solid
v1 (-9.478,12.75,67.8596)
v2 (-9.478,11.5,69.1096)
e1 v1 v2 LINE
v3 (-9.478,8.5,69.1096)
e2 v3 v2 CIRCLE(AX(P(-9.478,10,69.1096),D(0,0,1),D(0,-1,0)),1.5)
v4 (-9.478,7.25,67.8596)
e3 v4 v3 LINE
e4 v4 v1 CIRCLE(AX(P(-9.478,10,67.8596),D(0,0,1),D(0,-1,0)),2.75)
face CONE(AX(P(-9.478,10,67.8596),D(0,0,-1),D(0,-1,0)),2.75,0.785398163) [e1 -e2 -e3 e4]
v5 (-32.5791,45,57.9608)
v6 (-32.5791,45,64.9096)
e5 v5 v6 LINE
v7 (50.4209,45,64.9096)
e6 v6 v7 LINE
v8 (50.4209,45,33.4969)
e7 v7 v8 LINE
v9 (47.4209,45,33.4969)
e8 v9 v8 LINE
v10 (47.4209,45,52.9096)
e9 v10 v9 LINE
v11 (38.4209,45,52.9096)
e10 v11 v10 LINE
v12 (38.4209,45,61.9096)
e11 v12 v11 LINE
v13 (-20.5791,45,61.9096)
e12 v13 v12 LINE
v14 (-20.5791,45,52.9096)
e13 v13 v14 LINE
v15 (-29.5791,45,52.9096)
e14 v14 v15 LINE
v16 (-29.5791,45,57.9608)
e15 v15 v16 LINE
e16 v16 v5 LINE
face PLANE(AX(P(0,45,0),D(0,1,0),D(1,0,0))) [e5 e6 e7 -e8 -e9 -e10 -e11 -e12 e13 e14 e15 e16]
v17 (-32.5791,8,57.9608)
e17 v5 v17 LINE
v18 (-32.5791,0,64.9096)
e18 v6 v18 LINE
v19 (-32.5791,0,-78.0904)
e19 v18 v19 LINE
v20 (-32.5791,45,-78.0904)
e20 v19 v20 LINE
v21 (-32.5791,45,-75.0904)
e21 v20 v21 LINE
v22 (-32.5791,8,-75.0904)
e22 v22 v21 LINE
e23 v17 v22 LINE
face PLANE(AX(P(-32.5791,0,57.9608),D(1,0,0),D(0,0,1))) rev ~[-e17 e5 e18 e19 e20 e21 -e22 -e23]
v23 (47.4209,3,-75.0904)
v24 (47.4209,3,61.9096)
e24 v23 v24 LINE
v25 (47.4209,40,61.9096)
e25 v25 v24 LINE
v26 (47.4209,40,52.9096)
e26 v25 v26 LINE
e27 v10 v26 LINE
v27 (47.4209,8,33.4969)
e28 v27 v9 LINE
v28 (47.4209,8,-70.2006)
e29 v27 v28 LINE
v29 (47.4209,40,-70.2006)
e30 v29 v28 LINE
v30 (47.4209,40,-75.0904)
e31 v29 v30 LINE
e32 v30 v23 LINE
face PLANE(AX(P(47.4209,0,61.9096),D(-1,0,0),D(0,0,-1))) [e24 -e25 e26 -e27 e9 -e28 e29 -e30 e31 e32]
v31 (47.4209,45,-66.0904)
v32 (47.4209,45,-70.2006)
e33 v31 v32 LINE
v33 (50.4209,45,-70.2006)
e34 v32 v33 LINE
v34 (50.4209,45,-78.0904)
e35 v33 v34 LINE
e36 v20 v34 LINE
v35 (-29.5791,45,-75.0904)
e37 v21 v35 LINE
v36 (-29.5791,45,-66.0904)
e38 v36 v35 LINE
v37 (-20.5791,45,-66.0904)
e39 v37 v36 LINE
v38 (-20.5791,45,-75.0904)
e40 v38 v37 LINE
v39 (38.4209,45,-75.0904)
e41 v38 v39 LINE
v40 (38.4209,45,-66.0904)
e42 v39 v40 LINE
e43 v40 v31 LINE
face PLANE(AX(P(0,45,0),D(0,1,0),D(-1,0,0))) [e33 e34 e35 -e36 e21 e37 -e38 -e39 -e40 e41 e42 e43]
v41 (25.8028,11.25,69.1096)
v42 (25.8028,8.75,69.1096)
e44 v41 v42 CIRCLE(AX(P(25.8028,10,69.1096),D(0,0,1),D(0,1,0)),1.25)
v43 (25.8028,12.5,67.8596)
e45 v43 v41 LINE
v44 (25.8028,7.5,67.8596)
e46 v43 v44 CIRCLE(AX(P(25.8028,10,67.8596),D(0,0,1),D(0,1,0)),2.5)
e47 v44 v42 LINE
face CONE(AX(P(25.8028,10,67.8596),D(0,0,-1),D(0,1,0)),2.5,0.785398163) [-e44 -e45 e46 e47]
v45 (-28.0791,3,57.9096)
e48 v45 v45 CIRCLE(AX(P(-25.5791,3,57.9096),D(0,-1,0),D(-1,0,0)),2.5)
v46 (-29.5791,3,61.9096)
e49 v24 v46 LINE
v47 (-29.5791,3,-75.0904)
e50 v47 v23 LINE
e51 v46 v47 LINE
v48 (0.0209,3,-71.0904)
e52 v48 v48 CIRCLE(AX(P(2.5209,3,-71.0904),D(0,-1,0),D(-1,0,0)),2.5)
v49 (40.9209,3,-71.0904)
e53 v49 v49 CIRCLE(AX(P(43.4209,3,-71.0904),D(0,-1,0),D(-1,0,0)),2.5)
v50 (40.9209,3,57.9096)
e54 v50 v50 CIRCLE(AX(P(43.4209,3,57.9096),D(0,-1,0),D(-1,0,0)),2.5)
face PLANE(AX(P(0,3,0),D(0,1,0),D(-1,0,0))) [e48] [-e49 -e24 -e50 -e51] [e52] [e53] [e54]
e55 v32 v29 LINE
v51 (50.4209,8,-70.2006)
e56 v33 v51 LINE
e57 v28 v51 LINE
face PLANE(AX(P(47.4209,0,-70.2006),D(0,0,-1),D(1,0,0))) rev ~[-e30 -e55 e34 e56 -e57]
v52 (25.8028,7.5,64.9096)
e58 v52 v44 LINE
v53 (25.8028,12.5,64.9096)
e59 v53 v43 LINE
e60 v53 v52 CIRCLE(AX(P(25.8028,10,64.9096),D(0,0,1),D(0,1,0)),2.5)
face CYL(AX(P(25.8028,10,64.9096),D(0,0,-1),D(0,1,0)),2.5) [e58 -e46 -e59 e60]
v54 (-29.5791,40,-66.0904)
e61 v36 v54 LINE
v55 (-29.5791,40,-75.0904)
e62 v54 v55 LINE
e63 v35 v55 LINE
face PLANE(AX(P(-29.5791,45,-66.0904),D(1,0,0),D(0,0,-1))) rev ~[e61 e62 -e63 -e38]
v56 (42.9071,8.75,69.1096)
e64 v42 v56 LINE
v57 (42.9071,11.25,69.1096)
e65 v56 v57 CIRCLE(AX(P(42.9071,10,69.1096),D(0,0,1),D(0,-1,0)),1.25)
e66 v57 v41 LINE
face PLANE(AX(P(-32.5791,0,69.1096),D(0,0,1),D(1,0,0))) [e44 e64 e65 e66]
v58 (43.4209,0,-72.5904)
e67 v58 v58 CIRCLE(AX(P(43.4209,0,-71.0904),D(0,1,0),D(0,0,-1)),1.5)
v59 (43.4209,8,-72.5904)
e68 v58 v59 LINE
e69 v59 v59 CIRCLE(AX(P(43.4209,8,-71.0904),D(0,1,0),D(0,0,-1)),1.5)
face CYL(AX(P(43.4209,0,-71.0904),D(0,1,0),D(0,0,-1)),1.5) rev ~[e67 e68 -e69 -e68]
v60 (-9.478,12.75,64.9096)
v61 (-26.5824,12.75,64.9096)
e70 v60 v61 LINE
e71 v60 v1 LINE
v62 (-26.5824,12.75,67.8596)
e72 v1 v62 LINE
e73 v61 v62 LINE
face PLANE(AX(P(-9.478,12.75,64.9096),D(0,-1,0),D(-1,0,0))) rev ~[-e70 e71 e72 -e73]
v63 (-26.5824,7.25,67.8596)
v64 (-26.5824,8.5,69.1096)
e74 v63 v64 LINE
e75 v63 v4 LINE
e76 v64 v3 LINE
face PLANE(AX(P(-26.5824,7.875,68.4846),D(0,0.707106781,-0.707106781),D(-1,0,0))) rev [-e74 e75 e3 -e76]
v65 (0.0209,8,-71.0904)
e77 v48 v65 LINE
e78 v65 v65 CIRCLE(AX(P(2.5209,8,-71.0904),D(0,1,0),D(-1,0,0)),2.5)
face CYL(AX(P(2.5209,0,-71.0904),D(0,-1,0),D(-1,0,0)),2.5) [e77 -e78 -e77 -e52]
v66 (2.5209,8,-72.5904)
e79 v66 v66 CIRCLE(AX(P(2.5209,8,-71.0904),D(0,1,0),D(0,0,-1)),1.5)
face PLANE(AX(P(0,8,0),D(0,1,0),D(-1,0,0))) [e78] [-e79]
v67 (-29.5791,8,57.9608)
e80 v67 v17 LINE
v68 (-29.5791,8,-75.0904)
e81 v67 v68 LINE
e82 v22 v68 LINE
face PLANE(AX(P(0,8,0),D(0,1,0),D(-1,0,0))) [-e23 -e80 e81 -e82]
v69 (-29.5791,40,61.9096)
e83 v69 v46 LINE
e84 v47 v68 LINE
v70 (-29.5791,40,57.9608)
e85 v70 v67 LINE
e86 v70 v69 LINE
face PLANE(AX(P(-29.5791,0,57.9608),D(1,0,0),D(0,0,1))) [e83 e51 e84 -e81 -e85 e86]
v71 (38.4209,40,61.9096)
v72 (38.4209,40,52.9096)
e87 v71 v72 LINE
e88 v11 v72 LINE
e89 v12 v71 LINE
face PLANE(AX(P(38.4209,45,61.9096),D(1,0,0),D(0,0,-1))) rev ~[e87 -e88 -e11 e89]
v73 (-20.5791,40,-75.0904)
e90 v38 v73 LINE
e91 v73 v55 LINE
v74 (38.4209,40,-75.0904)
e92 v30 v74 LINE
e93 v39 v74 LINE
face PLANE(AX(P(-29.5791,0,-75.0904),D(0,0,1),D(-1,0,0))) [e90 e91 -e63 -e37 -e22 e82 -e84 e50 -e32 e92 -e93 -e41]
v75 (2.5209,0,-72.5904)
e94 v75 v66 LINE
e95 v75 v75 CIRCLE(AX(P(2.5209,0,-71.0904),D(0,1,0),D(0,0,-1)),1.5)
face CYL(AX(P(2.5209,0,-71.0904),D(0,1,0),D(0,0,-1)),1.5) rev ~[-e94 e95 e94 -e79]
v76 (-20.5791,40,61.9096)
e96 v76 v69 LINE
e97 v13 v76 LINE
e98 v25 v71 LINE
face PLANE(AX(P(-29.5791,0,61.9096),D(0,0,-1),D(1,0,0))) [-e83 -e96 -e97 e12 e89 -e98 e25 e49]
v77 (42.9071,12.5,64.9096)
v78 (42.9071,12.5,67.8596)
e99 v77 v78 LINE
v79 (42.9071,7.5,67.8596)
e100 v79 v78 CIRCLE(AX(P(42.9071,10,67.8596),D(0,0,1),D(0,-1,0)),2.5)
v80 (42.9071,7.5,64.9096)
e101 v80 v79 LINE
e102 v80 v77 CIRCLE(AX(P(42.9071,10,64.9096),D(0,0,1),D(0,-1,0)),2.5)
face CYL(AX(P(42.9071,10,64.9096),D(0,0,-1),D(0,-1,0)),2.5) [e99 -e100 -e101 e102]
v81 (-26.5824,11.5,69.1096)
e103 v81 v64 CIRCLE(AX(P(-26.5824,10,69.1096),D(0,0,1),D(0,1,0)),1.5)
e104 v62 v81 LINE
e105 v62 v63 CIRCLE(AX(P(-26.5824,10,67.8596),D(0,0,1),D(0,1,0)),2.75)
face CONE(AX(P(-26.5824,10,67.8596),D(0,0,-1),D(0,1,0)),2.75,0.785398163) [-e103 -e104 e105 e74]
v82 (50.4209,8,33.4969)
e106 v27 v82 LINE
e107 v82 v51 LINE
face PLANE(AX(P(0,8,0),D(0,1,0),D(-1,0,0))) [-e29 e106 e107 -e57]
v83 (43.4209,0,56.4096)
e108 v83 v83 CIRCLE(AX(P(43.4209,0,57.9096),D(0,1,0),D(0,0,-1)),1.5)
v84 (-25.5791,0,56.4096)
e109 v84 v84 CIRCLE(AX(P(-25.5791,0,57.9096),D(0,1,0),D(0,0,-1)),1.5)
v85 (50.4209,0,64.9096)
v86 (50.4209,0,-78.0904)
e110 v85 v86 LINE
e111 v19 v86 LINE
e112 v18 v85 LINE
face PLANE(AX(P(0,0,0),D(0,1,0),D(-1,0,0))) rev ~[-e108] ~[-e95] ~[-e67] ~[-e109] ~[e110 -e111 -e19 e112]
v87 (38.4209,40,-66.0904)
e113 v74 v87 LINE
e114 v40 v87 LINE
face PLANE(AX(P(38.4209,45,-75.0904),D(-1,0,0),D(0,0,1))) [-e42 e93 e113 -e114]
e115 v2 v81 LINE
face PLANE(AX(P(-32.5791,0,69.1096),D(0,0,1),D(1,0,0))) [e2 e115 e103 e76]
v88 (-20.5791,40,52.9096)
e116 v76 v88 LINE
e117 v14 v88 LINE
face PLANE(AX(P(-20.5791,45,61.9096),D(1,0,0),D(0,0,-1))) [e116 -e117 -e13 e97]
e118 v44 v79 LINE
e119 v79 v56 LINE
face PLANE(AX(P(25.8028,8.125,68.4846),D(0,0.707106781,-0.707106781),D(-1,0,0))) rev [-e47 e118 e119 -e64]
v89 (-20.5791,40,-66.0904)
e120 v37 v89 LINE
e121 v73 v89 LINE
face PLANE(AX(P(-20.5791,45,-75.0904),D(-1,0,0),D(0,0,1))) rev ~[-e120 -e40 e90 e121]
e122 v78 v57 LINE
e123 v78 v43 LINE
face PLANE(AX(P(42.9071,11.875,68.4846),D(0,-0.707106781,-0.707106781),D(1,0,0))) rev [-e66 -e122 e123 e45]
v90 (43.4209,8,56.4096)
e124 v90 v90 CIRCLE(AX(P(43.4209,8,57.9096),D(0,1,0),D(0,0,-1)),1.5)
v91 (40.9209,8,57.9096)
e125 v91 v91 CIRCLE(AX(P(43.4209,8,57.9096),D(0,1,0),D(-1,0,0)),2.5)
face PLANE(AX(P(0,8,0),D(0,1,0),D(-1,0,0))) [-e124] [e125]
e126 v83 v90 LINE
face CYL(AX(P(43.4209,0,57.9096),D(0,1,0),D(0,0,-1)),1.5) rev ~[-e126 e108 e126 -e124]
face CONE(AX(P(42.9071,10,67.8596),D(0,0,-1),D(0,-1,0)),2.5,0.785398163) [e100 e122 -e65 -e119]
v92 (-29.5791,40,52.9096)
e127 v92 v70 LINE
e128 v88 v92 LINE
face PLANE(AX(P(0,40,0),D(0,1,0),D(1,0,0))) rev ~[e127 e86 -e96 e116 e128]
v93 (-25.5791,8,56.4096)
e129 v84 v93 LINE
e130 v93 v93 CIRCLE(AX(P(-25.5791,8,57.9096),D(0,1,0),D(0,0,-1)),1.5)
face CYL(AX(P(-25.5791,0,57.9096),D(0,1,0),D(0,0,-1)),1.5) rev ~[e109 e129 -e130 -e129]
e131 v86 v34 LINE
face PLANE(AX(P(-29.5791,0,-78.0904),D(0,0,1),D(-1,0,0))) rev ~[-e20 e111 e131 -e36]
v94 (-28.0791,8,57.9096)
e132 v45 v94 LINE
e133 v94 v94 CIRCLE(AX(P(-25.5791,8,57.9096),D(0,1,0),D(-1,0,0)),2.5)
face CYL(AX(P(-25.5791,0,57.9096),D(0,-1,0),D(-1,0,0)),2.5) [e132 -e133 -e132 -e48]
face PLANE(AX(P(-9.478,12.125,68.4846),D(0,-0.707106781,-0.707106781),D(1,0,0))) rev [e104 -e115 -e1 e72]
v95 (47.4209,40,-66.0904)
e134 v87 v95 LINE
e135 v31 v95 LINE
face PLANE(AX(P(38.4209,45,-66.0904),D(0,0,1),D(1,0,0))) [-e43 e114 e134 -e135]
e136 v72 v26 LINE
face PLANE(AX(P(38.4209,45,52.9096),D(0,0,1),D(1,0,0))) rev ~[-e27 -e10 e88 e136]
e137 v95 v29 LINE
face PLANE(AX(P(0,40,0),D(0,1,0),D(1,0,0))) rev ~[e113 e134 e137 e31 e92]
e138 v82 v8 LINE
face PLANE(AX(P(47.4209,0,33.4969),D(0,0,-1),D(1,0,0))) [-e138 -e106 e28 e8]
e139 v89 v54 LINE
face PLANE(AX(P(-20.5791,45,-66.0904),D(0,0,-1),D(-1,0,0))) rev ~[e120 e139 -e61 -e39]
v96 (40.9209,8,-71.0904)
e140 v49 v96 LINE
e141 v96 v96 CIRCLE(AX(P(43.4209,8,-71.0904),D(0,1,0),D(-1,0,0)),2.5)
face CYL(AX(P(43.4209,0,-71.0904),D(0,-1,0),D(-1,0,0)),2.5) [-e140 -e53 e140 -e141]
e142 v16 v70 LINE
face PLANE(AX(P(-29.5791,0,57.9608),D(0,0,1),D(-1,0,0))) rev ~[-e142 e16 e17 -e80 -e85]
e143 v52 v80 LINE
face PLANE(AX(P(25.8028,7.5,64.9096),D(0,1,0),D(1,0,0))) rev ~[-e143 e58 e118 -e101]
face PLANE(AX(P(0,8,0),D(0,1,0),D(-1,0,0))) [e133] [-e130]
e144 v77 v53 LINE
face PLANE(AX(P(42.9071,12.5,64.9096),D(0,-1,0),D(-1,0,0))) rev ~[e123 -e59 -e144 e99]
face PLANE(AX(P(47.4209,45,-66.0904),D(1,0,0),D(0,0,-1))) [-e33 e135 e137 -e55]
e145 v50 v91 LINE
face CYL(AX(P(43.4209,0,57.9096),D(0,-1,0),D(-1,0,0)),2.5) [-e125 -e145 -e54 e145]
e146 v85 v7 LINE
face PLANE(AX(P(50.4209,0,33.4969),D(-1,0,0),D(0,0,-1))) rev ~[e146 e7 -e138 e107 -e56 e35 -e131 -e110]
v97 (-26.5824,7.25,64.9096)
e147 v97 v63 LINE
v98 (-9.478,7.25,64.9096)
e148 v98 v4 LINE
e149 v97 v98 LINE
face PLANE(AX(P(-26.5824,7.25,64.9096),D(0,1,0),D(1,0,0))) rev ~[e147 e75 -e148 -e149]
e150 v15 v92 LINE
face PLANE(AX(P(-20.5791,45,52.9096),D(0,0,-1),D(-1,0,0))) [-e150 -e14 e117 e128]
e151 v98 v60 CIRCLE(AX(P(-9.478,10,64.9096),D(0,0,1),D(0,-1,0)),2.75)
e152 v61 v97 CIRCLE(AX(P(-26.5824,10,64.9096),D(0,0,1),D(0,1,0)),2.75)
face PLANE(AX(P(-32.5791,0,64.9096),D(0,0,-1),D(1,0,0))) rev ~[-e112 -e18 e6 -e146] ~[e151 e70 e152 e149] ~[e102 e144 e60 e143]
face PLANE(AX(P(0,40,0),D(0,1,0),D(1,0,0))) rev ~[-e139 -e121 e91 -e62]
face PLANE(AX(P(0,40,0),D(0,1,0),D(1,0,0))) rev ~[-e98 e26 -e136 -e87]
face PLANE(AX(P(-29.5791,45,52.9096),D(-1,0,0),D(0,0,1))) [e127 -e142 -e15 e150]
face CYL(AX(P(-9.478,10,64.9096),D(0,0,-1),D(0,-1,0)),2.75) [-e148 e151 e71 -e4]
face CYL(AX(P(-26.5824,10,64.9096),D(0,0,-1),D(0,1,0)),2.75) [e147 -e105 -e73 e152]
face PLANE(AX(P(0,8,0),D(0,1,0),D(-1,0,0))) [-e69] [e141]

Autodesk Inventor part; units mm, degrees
ref_plane "YZ Plane" through (0, 0, 0) normal (1, 0, 0) x (0, 1, 0)
ref_plane "XZ Plane" through (0, 0, 0) normal (0, 1, 0) x (-1, 0, 0)
ref_plane "XY Plane" through (0, 0, 0) normal (0, 0, 1) x (1, 0, 0)
sketch "Sketch1" plane through (0, 0, 0) normal (0, 1, 0) x (-1, 0, 0)
  line L0 (32.5791, 64.9096) -> (-50.4209, 64.9096)
  line L1 (-50.4209, 64.9096) -> (-50.4209, -78.0904)
  line L2 (-50.4209, -78.0904) -> (32.5791, -78.0904)
  line L3 (32.5791, -78.0904) -> (32.5791, 64.9096)
  line L4 (29.5791, 61.9096) -> (-47.4209, 61.9096)
  line L5 (-47.4209, 61.9096) -> (-47.4209, -75.0904)
  line L6 (-47.4209, -75.0904) -> (29.5791, -75.0904)
  line L7 (29.5791, -75.0904) -> (29.5791, 61.9096)
  line L8 (29.5791, -75.0904) -> (29.5791, -78.0904)
  line L9 (-47.4209, -70.2006) -> (-50.4209, -70.2006)
  line L10 (-47.4209, 33.4969) -> (-50.4209, 33.4969)
  line L11 (29.5791, 57.9608) -> (32.5791, 57.9608)
  line L12 (29.5791, -75.0904) -> (32.5791, -75.0904)
  point P0 (0, 0)
  dimension "d0" = 143
  dimension "d1" = 83
  dimension "d2" = 3
extrude "Floor" add sketch "Sketch1" along normal blind 3
extrude "Walls" add sketch "Sketch1" along normal blind 20 contours L3 L11 L7 L4 L5 L10 L1 L0 | L3 L12 L7 L11 | L10 L5 L9 L1 | L3 L2 L8 L12 | L9 L5 L6 L8 L2 L1
sketch "Sketch2" plane through (0, 0, 0) normal (0, 1, 0) x (-1, 0, 0)
  line L0 (-47.4209, 61.9096) -> (29.5791, 61.9096) projected
  line L1 (29.5791, -75.0904) -> (-47.4209, -75.0904) projected
  line L2 (29.5791, 61.9096) -> (29.5791, -75.0904) projected
  line L3 (-47.4209, -75.0904) -> (-47.4209, 61.9096) projected
  circle A0 centre (25.5791, 57.9096) radius 2.5
  circle A1 centre (-43.4209, 57.9096) radius 2.5
  circle A2 centre (-43.4209, -71.0904) radius 2.5
  circle A3 centre (-2.5209, -71.0904) radius 2.5
  line L4 (-47.4209, 61.9096) -> (-47.4209, -75.0904) projected
  line L5 (-47.4209, -68.5904) -> (-50.4209, -68.5904)
  line L6 (-50.4209, -68.5904) -> (-50.4209, 27.9367)
  line L7 (-50.4209, 64.9096) -> (-50.4209, -78.0904) projected
  line L8 (-47.4209, 27.9367) -> (-50.4209, 27.9367)
  line L9 (29.5791, -75.0904) -> (29.5791, 61.9096) projected
  line L10 (29.5791, 55.4096) -> (32.4454, 55.4096)
  line L11 (-47.4209, -75.0904) -> (29.5791, -75.0904) projected
  line L12 (29.5791, -75.0904) -> (29.5791, -78.0904)
  point P0 (0, 0)
  dimension "d30" = 4
  dimension "d31" = 4
  dimension "d32" = 4
  dimension "d33" = 4
  dimension "d34" = 4
  dimension "d35" = 4
  dimension "d36" = 4
  dimension "d37" = 32.1
extrude "mounts" add sketch "Sketch2" along normal blind 8 contours A0 | A1 | A2 | A3
hole "Hole1" at (43.4209, 0, -71.0904) at (43.4209, 0, 57.9096) at (2.5209, 0, -71.0904) at (-25.5791, 0, 57.9096) direction (0, 1, 0) diameter 3 depth 8
extrude "Extrusion5" cut sketch "Sketch1" along normal blind 20 contours L10 L5 L9 L1
extrude "Extrusion6" cut sketch "Sketch1" along normal blind 20 contours L3 L12 L7 L11 | L3 L2 L8 L12
extrude "Extrusion7" add sketch "Sketch1" along normal blind 8 contours L10 L5 L9 L1
extrude "Extrusion8" add sketch "Sketch1" along normal blind 8 contours L3 L12 L7 L11 | L3 L2 L8 L12
sketch "Sketch3" plane through (-32.5791, 0, 64.9096) normal (0, 0, 1) x (1, 0, 0)
  line L0 (0, 0) -> (0, 20) construction
  line L1 (0, 10) -> (97.9753, 10) construction
  line L2 (0, 20) -> (83, 20) construction
  line L3 (5.9967, 10) -> (23.1011, 10) construction
  line L4 (5.9967, 7.25) -> (23.1011, 7.25)
  line L5 (23.1011, 12.75) -> (5.9967, 12.75)
  arc A0 (5.9967, 12.75) -> (5.9967, 7.25) centre (5.9967, 10) ccw
  arc A1 (23.1011, 7.25) -> (23.1011, 12.75) centre (23.1011, 10) ccw
  line L6 (75.4862, 10) -> (58.3819, 10) construction
  line L7 (75.4862, 12.5) -> (58.3819, 12.5)
  line L8 (58.3819, 7.5) -> (75.4862, 7.5)
  arc A2 (75.4862, 7.5) -> (75.4862, 12.5) centre (75.4862, 10) ccw
  arc A3 (58.3819, 12.5) -> (58.3819, 7.5) centre (58.3819, 10) ccw
  line L9 (0, 0) -> (83, 0) projected
  point P0 (32.5791, 0)
  point P1 (14.5489, 10)
  point P2 (66.9341, 10)
  point P3 (40.0449, 10)
  dimension "d59" = 5.5
  dimension "d60" = 5
  dimension "d80" = 10
  dimension "d81" = 10
extrude "Extrusion9" add sketch "Sketch3" along normal blind 4.2
chamfer "Chamfer1" distance 1.25 angle 45 8 edges at (-6.7281, 10, 69.1096) (-18.0302, 12.75, 69.1096) (-29.3324, 10, 69.1096) (-18.0302, 7.25, 69.1096) (45.4071, 10, 69.1096) (34.3549, 12.5, 69.1096) (23.3027, 10, 69.1096) (34.3549, 7.5, 69.1096)
hole "Hole2" at (8.9209, 10, 64.9096) direction (0, 0, 1) diameter 4 depth 3
extrude "Extrusion10" add sketch "Sketch1" along normal blind 45 contours L3 L11 L7 L4 L5 L10 L1 L0
extrude "Extrusion11" add sketch "Sketch1" along normal blind 45 contours L9 L5 L6 L8 L2 L1
extrude "Extrusion12" add sketch "Sketch1" along normal blind 45 contours L3 L2 L8 L12
ref_plane "Work Plane1" through (47.4209, 45, -75.0904) normal (0, 1, 0) x (1, 0, 0)
sketch "Sketch4" plane through (0, 45, 0) normal (0, 1, 0) x (1, 0, 0)
  line L0 (47.4209, -61.9096) -> (47.4209, 75.0904) projected
  line L1 (47.4209, -61.9096) -> (38.4209, -61.9096)
  line L2 (38.4209, -61.9096) -> (38.4209, -52.9096)
  line L3 (38.4209, -52.9096) -> (47.4209, -52.9096)
  line L4 (47.4209, -52.9096) -> (47.4209, -61.9096)
  line L5 (47.4209, -61.9096) -> (-29.5791, -61.9096) projected
  line L6 (-29.5791, -61.9096) -> (-20.5791, -61.9096)
  line L7 (-20.5791, -61.9096) -> (-20.5791, -52.9096)
  line L8 (-20.5791, -52.9096) -> (-29.5791, -52.9096)
  line L9 (-29.5791, -52.9096) -> (-29.5791, -61.9096)
  line L10 (47.4209, 75.0904) -> (-29.5791, 75.0904) projected
  line L11 (47.4209, 75.0904) -> (38.4209, 75.0904)
  line L12 (38.4209, 75.0904) -> (38.4209, 66.0904)
  line L13 (38.4209, 66.0904) -> (47.4209, 66.0904)
  line L14 (47.4209, 66.0904) -> (47.4209, 75.0904)
  line L15 (-29.5791, 75.0904) -> (-20.5791, 75.0904)
  line L16 (-20.5791, 75.0904) -> (-20.5791, 66.0904)
  line L17 (-20.5791, 66.0904) -> (-29.5791, 66.0904)
  line L18 (-29.5791, 66.0904) -> (-29.5791, 75.0904)
  line L19 (-32.5791, 75.0904) -> (47.4209, 75.0904) projected
  point P0 (0, 0)
  dimension "d84" = 9
  dimension "d85" = 9
  dimension "d86" = 9
  dimension "d87" = 9
  dimension "d88" = 9
  dimension "d89" = 9
  dimension "d90" = 9
extrude "Extrusion13" add sketch "Sketch4" against normal blind 5 contours L5 L9 L8 L7
extrude "Extrusion14" add sketch "Sketch4" against normal blind 5 contours L1 L2 L3 L0 | L13 L12 L10 L0 | L16 L17 L18 L10
properties part number "rumba_frame_mount"
